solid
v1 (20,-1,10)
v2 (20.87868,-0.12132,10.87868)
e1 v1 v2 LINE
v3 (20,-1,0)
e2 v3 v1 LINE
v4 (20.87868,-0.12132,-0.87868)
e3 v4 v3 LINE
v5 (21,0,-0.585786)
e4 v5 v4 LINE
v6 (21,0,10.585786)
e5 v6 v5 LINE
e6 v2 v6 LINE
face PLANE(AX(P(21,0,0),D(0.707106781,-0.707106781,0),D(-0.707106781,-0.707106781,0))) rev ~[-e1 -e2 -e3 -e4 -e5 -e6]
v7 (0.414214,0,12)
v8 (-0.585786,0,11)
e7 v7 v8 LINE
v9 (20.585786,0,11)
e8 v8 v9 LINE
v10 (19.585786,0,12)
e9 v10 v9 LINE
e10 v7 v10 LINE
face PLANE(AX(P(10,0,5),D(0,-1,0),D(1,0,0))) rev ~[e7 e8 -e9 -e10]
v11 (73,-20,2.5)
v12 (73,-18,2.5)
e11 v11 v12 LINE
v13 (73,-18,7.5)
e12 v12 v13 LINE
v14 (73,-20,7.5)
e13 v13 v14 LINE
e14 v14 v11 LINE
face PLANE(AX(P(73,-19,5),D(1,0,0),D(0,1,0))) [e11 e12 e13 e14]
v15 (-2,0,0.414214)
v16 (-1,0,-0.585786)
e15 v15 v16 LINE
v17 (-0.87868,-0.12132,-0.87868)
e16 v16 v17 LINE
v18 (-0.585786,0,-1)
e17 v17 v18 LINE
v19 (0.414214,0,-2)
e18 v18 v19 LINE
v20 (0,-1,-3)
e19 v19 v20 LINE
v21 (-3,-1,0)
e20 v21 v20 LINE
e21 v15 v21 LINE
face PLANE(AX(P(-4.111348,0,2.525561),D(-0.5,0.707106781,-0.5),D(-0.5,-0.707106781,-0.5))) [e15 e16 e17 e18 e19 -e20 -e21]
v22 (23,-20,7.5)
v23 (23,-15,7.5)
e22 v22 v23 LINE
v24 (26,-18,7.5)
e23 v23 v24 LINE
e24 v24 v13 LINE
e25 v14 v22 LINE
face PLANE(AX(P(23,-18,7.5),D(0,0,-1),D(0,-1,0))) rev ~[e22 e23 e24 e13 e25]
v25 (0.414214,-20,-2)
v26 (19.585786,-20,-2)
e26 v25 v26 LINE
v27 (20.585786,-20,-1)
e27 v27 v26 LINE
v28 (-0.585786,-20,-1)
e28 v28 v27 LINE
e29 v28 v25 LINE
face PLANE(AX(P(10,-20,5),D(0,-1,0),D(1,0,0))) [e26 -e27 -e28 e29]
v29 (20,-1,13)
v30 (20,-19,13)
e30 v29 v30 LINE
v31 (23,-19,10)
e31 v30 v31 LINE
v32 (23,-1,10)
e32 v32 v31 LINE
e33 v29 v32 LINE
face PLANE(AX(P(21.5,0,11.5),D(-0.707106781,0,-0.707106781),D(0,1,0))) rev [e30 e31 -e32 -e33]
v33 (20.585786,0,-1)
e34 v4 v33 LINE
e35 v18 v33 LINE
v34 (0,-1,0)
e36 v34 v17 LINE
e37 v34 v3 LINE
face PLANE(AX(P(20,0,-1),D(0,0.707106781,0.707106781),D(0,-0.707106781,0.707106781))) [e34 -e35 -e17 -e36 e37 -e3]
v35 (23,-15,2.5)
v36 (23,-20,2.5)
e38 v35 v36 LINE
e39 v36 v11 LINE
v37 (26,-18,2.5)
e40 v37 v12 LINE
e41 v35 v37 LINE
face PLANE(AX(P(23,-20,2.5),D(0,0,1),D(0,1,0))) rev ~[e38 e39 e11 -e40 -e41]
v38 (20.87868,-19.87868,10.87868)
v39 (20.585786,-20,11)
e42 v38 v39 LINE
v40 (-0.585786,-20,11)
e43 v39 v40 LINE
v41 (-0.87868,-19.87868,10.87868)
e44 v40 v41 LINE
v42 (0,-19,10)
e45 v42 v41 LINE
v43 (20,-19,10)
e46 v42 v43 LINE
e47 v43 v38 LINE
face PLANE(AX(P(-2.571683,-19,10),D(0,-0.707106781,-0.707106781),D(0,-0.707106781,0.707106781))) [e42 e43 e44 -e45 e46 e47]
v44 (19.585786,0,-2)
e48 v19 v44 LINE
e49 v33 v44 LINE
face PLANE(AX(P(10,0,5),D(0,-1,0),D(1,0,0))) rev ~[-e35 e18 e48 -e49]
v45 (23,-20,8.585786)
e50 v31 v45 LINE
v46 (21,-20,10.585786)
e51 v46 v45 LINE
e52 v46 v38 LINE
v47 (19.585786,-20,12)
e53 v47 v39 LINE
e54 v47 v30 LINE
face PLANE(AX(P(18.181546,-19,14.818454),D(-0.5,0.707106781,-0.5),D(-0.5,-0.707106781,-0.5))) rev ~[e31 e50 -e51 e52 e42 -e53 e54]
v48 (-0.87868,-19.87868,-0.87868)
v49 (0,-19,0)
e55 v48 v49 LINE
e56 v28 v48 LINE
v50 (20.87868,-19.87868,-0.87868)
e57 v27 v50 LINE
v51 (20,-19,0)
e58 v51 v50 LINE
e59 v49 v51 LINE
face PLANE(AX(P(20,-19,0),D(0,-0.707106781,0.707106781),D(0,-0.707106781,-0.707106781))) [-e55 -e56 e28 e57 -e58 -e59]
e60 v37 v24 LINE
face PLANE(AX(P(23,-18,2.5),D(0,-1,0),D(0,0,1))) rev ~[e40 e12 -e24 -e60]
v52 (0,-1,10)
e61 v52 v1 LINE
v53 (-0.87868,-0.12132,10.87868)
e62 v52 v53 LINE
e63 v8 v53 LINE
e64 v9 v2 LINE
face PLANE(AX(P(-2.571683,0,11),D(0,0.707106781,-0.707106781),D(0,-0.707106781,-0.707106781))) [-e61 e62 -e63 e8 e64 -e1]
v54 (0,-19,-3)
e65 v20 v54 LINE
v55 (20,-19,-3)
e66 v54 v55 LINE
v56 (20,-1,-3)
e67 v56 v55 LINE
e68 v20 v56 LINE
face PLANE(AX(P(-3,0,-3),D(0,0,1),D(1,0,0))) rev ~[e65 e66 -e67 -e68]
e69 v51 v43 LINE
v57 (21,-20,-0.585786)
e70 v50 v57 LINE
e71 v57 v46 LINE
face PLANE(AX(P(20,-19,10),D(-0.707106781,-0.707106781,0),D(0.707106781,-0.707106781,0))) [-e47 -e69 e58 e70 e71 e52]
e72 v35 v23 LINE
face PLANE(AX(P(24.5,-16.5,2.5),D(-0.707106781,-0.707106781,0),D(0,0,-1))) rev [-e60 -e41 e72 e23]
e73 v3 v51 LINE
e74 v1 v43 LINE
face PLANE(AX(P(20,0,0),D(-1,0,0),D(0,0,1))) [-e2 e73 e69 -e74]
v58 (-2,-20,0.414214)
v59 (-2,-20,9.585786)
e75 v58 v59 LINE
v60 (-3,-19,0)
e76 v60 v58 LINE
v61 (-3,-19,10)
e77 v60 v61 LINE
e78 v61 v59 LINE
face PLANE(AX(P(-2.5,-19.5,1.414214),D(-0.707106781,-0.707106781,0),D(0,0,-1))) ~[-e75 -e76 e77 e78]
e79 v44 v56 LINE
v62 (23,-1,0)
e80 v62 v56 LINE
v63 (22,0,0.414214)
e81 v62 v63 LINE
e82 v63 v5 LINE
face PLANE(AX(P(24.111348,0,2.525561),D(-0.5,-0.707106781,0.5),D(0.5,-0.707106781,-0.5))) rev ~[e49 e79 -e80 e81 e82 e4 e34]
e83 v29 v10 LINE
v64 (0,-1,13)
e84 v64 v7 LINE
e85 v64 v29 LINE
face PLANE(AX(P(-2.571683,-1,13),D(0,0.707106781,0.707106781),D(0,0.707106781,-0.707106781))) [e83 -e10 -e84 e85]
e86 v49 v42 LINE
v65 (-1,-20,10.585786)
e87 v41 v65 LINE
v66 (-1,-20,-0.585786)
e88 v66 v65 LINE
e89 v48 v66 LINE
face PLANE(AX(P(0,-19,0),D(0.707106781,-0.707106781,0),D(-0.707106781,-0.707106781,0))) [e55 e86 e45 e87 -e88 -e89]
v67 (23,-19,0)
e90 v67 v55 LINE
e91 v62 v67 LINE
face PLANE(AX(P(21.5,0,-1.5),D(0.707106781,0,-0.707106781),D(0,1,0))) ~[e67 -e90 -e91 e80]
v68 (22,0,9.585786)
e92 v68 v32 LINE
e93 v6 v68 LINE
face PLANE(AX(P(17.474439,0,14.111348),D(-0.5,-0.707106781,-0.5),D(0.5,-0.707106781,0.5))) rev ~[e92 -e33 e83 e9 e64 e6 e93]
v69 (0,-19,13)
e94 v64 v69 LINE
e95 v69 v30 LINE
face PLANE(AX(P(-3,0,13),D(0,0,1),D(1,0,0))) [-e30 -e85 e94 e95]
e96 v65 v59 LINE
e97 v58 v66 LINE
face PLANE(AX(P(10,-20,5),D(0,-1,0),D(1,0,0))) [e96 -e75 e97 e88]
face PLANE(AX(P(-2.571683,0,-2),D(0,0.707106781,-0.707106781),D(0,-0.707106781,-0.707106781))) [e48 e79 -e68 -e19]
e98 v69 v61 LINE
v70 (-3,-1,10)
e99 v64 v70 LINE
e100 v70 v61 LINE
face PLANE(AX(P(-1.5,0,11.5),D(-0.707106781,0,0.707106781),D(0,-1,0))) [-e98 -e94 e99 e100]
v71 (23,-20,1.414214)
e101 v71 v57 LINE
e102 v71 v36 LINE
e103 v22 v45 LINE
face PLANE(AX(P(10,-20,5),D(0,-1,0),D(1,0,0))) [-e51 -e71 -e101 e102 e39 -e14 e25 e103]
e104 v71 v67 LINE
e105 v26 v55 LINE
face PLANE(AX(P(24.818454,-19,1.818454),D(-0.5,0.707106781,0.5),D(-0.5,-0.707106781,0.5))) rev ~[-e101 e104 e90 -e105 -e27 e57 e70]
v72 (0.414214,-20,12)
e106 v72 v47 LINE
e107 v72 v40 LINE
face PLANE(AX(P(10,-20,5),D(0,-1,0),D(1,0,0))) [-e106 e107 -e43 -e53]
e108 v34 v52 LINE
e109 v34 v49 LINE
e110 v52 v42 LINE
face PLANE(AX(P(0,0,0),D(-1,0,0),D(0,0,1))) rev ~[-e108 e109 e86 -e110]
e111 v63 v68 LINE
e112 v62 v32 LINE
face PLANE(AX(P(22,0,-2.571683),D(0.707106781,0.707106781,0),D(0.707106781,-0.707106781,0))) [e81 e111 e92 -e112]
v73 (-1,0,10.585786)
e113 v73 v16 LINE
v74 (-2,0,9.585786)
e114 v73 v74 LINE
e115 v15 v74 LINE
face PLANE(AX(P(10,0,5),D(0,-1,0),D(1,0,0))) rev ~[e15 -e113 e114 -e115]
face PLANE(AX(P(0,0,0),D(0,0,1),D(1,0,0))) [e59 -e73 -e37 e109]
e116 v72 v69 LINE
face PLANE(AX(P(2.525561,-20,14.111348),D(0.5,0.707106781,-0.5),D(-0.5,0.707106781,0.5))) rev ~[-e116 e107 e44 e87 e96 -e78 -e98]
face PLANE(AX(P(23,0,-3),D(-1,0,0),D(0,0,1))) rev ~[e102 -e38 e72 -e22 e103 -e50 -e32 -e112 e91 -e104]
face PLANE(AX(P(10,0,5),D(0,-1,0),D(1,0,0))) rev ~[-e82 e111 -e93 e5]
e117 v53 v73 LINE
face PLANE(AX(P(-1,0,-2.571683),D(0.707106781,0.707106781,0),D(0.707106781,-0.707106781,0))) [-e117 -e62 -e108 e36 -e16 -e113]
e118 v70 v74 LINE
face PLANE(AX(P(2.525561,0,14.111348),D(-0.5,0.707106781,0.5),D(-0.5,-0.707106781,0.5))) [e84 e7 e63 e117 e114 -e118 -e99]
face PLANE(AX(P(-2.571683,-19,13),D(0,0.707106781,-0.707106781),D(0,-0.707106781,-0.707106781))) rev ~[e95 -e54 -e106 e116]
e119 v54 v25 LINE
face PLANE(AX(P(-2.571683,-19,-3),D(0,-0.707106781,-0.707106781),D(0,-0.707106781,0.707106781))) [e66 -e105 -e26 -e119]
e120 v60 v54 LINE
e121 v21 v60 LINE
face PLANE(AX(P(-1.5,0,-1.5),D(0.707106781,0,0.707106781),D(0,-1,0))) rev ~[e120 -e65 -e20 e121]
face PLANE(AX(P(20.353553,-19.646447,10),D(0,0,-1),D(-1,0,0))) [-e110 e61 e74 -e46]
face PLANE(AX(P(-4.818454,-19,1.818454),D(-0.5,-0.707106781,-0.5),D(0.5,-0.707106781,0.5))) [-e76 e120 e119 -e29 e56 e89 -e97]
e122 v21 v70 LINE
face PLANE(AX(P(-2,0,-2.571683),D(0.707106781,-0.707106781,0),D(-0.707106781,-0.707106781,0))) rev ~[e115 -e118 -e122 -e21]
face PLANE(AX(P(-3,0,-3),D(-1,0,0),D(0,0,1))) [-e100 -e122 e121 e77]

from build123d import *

# Parameters (mm, degrees)
F0_W         = 26
F0_H         = 16
F0_W_2       = 20
F0_H_2       = 10
F1_DEPTH     = 20
F3_DEPTH     = 50
F4_SIZE      = 3
F5_T1_DEPTH  = 10
F5_T3_DEPTH  = 20
F5_T5_DEPTH  = 9.3860066631
F5_T7_DEPTH  = 9.3860066631
F5_T9_DEPTH  = 9.3860066631
F5_T11_DEPTH = 9.3860066631
F5_T13_DEPTH = 25.1433659759
F5_T15_DEPTH = 15.1433659759
F5_T21_DEPTH = 22.571682988
F5_T25_DEPTH = 12.571682988
F5_T32_DEPTH = 22.571682988
F5_T36_DEPTH = 12.571682988
F5_T43_DEPTH = 12.571682988
F5_T47_DEPTH = 22.571682988
F5_T54_DEPTH = 22.571682988
F5_T58_DEPTH = 12.571682988
F6_T1_DEPTH  = 9.3860066631
F6_T3_DEPTH  = 10
F6_T5_DEPTH  = 9.3860066631
F6_T7_DEPTH  = 25.1433659759
F6_T9_DEPTH  = 20
F6_T14_DEPTH = 9.3860066631
F6_T19_DEPTH = 9.3860066631
F6_T25_DEPTH = 22.571682988
F6_T30_DEPTH = 12.571682988
F6_T38_DEPTH = 22.571682988
F6_T43_DEPTH = 12.571682988
F6_T51_DEPTH = 22.571682988
F6_T56_DEPTH = 12.571682988
F6_T64_DEPTH = 12.571682988
F6_T69_DEPTH = 22.571682988
F7_SIZE      = 1


# Not quite as in the source:
# - a fillet or chamfer that OpenCascade refuses, or shapes differently, is made with other operations: its cross-section is extruded or revolved along the edge and cut away or added


with BuildPart() as f1:
    # F0 (on Front) → F1 (new body)
    with BuildSketch(Plane.XZ):
        with Locations((10, 5)):
            Rectangle(F0_W, F0_H)
        with Locations((10, 5)):
            Rectangle(F0_W_2, F0_H_2, mode=Mode.SUBTRACT)
    extrude(amount=F1_DEPTH)

    # F2 (on face) → F3 (join)
    with BuildSketch(Plane.YZ.offset(23)):
        Polygon((-18, 2.5), (-18, 5), (-18, 7.5), (-20, 7.5), (-20, 5), (-20, 2.5), align=None)
    extrude(amount=F3_DEPTH)

    # F4
    f4_edges = [f1.edges().sort_by_distance(p)[0] for p in [
        (-3, -10, 13),
        (23, -10, 13),
        (23, -18, 5),
        (-3, -10, -3),
        (23, -10, -3),
    ]]
    chamfer(f4_edges, length=F4_SIZE)

    # F5: chamfer of 1 on 12 edges, made by hand

    # F5_s2 → F5_t1 (cut)
    with BuildSketch(Plane.XY):
        Polygon((21, 0), (20, -1), (20, 0), align=None)
        Polygon((-1, 0), (0, -1), (0, 0), align=None)
    extrude(amount=F5_T1_DEPTH, mode=Mode.SUBTRACT)

    # F5_s4 → F5_t3 (cut)
    with BuildSketch(Plane.YZ):
        Polygon((0, 11), (-1, 10), (0, 10), align=None)
        Polygon((0, -1), (-1, 0), (0, 0), align=None)
    extrude(amount=F5_T3_DEPTH, mode=Mode.SUBTRACT)

    # F5_s6 → F5_t5 (cut)
    with BuildSketch(Plane(origin=(-3.3184544799, 0, 3.3184544799), x_dir=(0, 1, 0), z_dir=(0.7071067812, 0, -0.7071067812))):
        Polygon((0, -1.1213203436), (-1, -2.1213203436), (0, -2.1213203436), align=None)
    extrude(amount=F5_T5_DEPTH, mode=Mode.SUBTRACT)

    # F5_s8 → F5_t7 (cut)
    with BuildSketch(Plane(origin=(13.3184544799, 0, 13.3184544799), x_dir=(0, 1, 0), z_dir=(-0.7071067812, 0, -0.7071067812))):
        Polygon((0, 15.2634559673), (-1, 16.2634559673), (0, 16.2634559673), align=None)
    extrude(amount=F5_T7_DEPTH, mode=Mode.SUBTRACT)

    # F5_s10 → F5_t9 (cut)
    with BuildSketch(Plane(origin=(1.6815455201, 0, -1.6815455201), x_dir=(0, 1, 0), z_dir=(0.7071067812, 0, -0.7071067812))):
        Polygon((0, 22.3345237792), (-1, 23.3345237792), (0, 23.3345237792), align=None)
    extrude(amount=F5_T9_DEPTH, mode=Mode.SUBTRACT)

    # F5_s12 → F5_t11 (cut)
    with BuildSketch(Plane(origin=(8.3184544799, 0, 8.3184544799), x_dir=(0, 1, 0), z_dir=(-0.7071067812, 0, -0.7071067812))):
        Polygon((0, -8.1923881554), (-1, -9.1923881554), (0, -9.1923881554), align=None)
    extrude(amount=F5_T11_DEPTH, mode=Mode.SUBTRACT)

    # F5_s14 → F5_t13 (cut)
    with BuildSketch(Plane.YZ.offset(-2.571682988)):
        Polygon((0, -2), (-1, -3), (0, -3), align=None)
        Polygon((-1, 13), (0, 12), (0, 13), align=None)
    extrude(amount=F5_T13_DEPTH, mode=Mode.SUBTRACT)

    # F5_s16 → F5_t15 (cut)
    with BuildSketch(Plane.XY.offset(-2.571682988)):
        Polygon((22, 0), (23, -1), (23, 0), align=None)
        Polygon((-2, 0), (-3, -1), (-3, 0), align=None)
    extrude(amount=F5_T15_DEPTH, mode=Mode.SUBTRACT)


with BuildPart() as f5_tool19:
    # F5_s20 → F5_t21 (new body)
    with BuildSketch(Plane.YZ):
        Polygon((0, 11), (-1, 10), (0, 10), align=None)
    extrude(amount=F5_T21_DEPTH)

    split(bisect_by=Plane.YZ.offset(20), keep=Keep.TOP)


with BuildPart() as f5_tool23:
    # F5_s24 → F5_t25 (new body)
    with BuildSketch(Plane.XY.offset(12.571682988)):
        Polygon((21, 0), (20, -1), (20, 0), align=None)
    extrude(amount=-F5_T25_DEPTH)

    split(bisect_by=Plane.XY.offset(10), keep=Keep.TOP)


with BuildPart() as f5_tool19_1:
    add(f5_tool19.part)

    # F5_t27: intersect F5_tool23
    add(f5_tool23.part, mode=Mode.INTERSECT)


with BuildPart() as f1_1:
    add(f1.part)

    # F5_t17: cut F5_tool19
    add(f5_tool19_1.part, mode=Mode.SUBTRACT)


with BuildPart() as f5_tool30:
    # F5_s31 → F5_t32 (new body)
    with BuildSketch(Plane.YZ.offset(22.571682988)):
        Polygon((0, -1), (-1, 0), (0, 0), align=None)
    extrude(amount=-F5_T32_DEPTH)

    split(bisect_by=Plane.YZ.offset(20), keep=Keep.TOP)


with BuildPart() as f5_tool34:
    # F5_s35 → F5_t36 (new body)
    with BuildSketch(Plane.XY.offset(10)):
        Polygon((21, 0), (20, -1), (20, 0), align=None)
    extrude(amount=-F5_T36_DEPTH)

    split(bisect_by=Plane.XY, keep=Keep.BOTTOM)


with BuildPart() as f5_tool30_1:
    add(f5_tool30.part)

    # F5_t38: intersect F5_tool34
    add(f5_tool34.part, mode=Mode.INTERSECT)


with BuildPart() as f1_2:
    add(f1_1.part)

    # F5_t28: cut F5_tool30
    add(f5_tool30_1.part, mode=Mode.SUBTRACT)


with BuildPart() as f5_tool41:
    # F5_s42 → F5_t43 (new body)
    with BuildSketch(Plane.XY):
        Polygon((-1, 0), (0, -1), (0, 0), align=None)
    extrude(amount=F5_T43_DEPTH)

    split(bisect_by=Plane.XY.offset(10), keep=Keep.TOP)


with BuildPart() as f5_tool45:
    # F5_s46 → F5_t47 (new body)
    with BuildSketch(Plane.YZ.offset(-2.571682988)):
        Polygon((0, 11), (-1, 10), (0, 10), align=None)
    extrude(amount=F5_T47_DEPTH)

    split(bisect_by=Plane.YZ, keep=Keep.BOTTOM)


with BuildPart() as f5_tool41_1:
    add(f5_tool41.part)

    # F5_t49: intersect F5_tool45
    add(f5_tool45.part, mode=Mode.INTERSECT)


with BuildPart() as f1_3:
    add(f1_2.part)

    # F5_t39: cut F5_tool41
    add(f5_tool41_1.part, mode=Mode.SUBTRACT)


with BuildPart() as f5_tool52:
    # F5_s53 → F5_t54 (new body)
    with BuildSketch(Plane.YZ.offset(20)):
        Polygon((0, -1), (-1, 0), (0, 0), align=None)
    extrude(amount=-F5_T54_DEPTH)

    split(bisect_by=Plane.YZ, keep=Keep.BOTTOM)


with BuildPart() as f5_tool56:
    # F5_s57 → F5_t58 (new body)
    with BuildSketch(Plane.XY.offset(-2.571682988)):
        Polygon((-1, 0), (0, -1), (0, 0), align=None)
    extrude(amount=F5_T58_DEPTH)

    split(bisect_by=Plane.XY, keep=Keep.BOTTOM)


with BuildPart() as f5_tool52_1:
    add(f5_tool52.part)

    # F5_t60: intersect F5_tool56
    add(f5_tool56.part, mode=Mode.INTERSECT)


with BuildPart() as f1_4:
    add(f1_3.part)

    # F5_t50: cut F5_tool52
    add(f5_tool52_1.part, mode=Mode.SUBTRACT)

    # F6: chamfer of 1 on 10 edges, made by hand

    # F6_s2 → F6_t1 (cut)
    with BuildSketch(Plane(origin=(-3.3184544799, 0, 3.3184544799), x_dir=(0, 1, 0), z_dir=(0.7071067812, 0, -0.7071067812))):
        Polygon((-19, -2.1213203436), (-20, -1.1213203436), (-20, -2.1213203436), align=None)
    extrude(amount=F6_T1_DEPTH, mode=Mode.SUBTRACT)

    # F6_s4 → F6_t3 (cut)
    with BuildSketch(Plane.XY):
        Polygon((0, -19), (-1, -20), (0, -20), align=None)
        Polygon((20, -19), (21, -20), (20, -20), align=None)
    extrude(amount=F6_T3_DEPTH, mode=Mode.SUBTRACT)

    # F6_s6 → F6_t5 (cut)
    with BuildSketch(Plane(origin=(8.3184544799, 0, 8.3184544799), x_dir=(0, 1, 0), z_dir=(-0.7071067812, 0, -0.7071067812))):
        Polygon((-20, -8.1923881554), (-19, -9.1923881554), (-20, -9.1923881554), align=None)
    extrude(amount=F6_T5_DEPTH, mode=Mode.SUBTRACT)

    # F6_s8 → F6_t7 (cut)
    with BuildSketch(Plane.YZ.offset(-2.571682988)):
        Polygon((-19, -3), (-20, -2), (-20, -3), align=None)
        Polygon((-19, 13), (-20, 12), (-20, 13), align=None)
    extrude(amount=F6_T7_DEPTH, mode=Mode.SUBTRACT)

    # F6_s10 → F6_t9 (cut)
    with BuildSketch(Plane.YZ):
        Polygon((-19, 0), (-20, -1), (-20, 0), align=None)
        Polygon((-19, 10), (-20, 11), (-20, 10), align=None)
    extrude(amount=F6_T9_DEPTH, mode=Mode.SUBTRACT)


with BuildPart() as f6_tool12:
    # F6_s13 → F6_t14 (new body)
    with BuildSketch(Plane(origin=(1.6815455201, 0, -1.6815455201), x_dir=(0, 1, 0), z_dir=(0.7071067812, 0, -0.7071067812))):
        Polygon((-19, 23.3345237792), (-20, 22.3345237792), (-20, 23.3345237792), align=None)
    extrude(amount=F6_T14_DEPTH)

    split(bisect_by=Plane.XY.offset(7.5), keep=Keep.TOP)


with BuildPart() as f1_5:
    add(f1_4.part)

    # F6_t11: cut F6_tool12
    add(f6_tool12.part, mode=Mode.SUBTRACT)


with BuildPart() as f6_tool17:
    # F6_s18 → F6_t19 (new body)
    with BuildSketch(Plane(origin=(13.3184544799, 0, 13.3184544799), x_dir=(0, 1, 0), z_dir=(-0.7071067812, 0, -0.7071067812))):
        Polygon((-19, 16.2634559673), (-20, 15.2634559673), (-20, 16.2634559673), align=None)
    extrude(amount=F6_T19_DEPTH)

    split(bisect_by=Plane.XY.offset(2.5), keep=Keep.BOTTOM)


with BuildPart() as f1_6:
    add(f1_5.part)

    # F6_t16: cut F6_tool17
    add(f6_tool17.part, mode=Mode.SUBTRACT)


with BuildPart() as f6_tool23:
    # F6_s24 → F6_t25 (new body)
    with BuildSketch(Plane.YZ.offset(20)):
        Polygon((-19, 0), (-20, -1), (-20, 0), align=None)
    extrude(amount=-F6_T25_DEPTH)

    split(bisect_by=Plane(origin=(-1.5, 0, -1.5), x_dir=(0, 1, 0), z_dir=(0.7071067812, 0, 0.7071067812)), keep=Keep.TOP)

    split(bisect_by=Plane.YZ, keep=Keep.BOTTOM)


with BuildPart() as f6_tool28:
    # F6_s29 → F6_t30 (new body)
    with BuildSketch(Plane.XY.offset(-2.571682988)):
        Polygon((0, -19), (-1, -20), (0, -20), align=None)
    extrude(amount=F6_T30_DEPTH)

    split(bisect_by=Plane(origin=(-1.5, 0, -1.5), x_dir=(0, 1, 0), z_dir=(0.7071067812, 0, 0.7071067812)), keep=Keep.TOP)

    split(bisect_by=Plane.XY, keep=Keep.BOTTOM)


with BuildPart() as f6_tool23_1:
    add(f6_tool23.part)

    # F6_t33: intersect F6_tool28
    add(f6_tool28.part, mode=Mode.INTERSECT)


with BuildPart() as f1_7:
    add(f1_6.part)

    # F6_t21: cut F6_tool23
    add(f6_tool23_1.part, mode=Mode.SUBTRACT)


with BuildPart() as f6_tool36:
    # F6_s37 → F6_t38 (new body)
    with BuildSketch(Plane.YZ.offset(-2.571682988)):
        Polygon((-19, 10), (-20, 11), (-20, 10), align=None)
    extrude(amount=F6_T38_DEPTH)

    split(bisect_by=Plane.YZ, keep=Keep.BOTTOM)

    split(bisect_by=Plane(origin=(-6.5, 0, 6.5), x_dir=(0, 1, 0), z_dir=(0.7071067812, 0, -0.7071067812)), keep=Keep.TOP)


with BuildPart() as f6_tool41:
    # F6_s42 → F6_t43 (new body)
    with BuildSketch(Plane.XY):
        Polygon((0, -19), (-1, -20), (0, -20), align=None)
    extrude(amount=F6_T43_DEPTH)

    split(bisect_by=Plane.XY.offset(10), keep=Keep.TOP)

    split(bisect_by=Plane(origin=(-6.5, 0, 6.5), x_dir=(0, 1, 0), z_dir=(0.7071067812, 0, -0.7071067812)), keep=Keep.TOP)


with BuildPart() as f6_tool36_1:
    add(f6_tool36.part)

    # F6_t46: intersect F6_tool41
    add(f6_tool41.part, mode=Mode.INTERSECT)


with BuildPart() as f1_8:
    add(f1_7.part)

    # F6_t34: cut F6_tool36
    add(f6_tool36_1.part, mode=Mode.SUBTRACT)


with BuildPart() as f6_tool49:
    # F6_s50 → F6_t51 (new body)
    with BuildSketch(Plane.YZ.offset(22.571682988)):
        Polygon((-19, 0), (-20, -1), (-20, 0), align=None)
    extrude(amount=-F6_T51_DEPTH)

    split(bisect_by=Plane(origin=(11.5, 0, -11.5), x_dir=(0, 1, 0), z_dir=(-0.7071067812, 0, 0.7071067812)), keep=Keep.TOP)

    split(bisect_by=Plane.YZ.offset(20), keep=Keep.TOP)


with BuildPart() as f6_tool54:
    # F6_s55 → F6_t56 (new body)
    with BuildSketch(Plane.XY.offset(10)):
        Polygon((20, -19), (21, -20), (20, -20), align=None)
    extrude(amount=-F6_T56_DEPTH)

    split(bisect_by=Plane(origin=(11.5, 0, -11.5), x_dir=(0, 1, 0), z_dir=(-0.7071067812, 0, 0.7071067812)), keep=Keep.TOP)

    split(bisect_by=Plane.XY, keep=Keep.BOTTOM)


with BuildPart() as f6_tool49_1:
    add(f6_tool49.part)

    # F6_t59: intersect F6_tool54
    add(f6_tool54.part, mode=Mode.INTERSECT)


with BuildPart() as f1_9:
    add(f1_8.part)

    # F6_t47: cut F6_tool49
    add(f6_tool49_1.part, mode=Mode.SUBTRACT)


with BuildPart() as f6_tool62:
    # F6_s63 → F6_t64 (new body)
    with BuildSketch(Plane.XY.offset(12.571682988)):
        Polygon((20, -19), (21, -20), (20, -20), align=None)
    extrude(amount=-F6_T64_DEPTH)

    split(bisect_by=Plane(origin=(16.5, 0, 16.5), x_dir=(0, 1, 0), z_dir=(-0.7071067812, 0, -0.7071067812)), keep=Keep.TOP)

    split(bisect_by=Plane.XY.offset(10), keep=Keep.TOP)


with BuildPart() as f6_tool67:
    # F6_s68 → F6_t69 (new body)
    with BuildSketch(Plane.YZ):
        Polygon((-19, 10), (-20, 11), (-20, 10), align=None)
    extrude(amount=F6_T69_DEPTH)

    split(bisect_by=Plane(origin=(16.5, 0, 16.5), x_dir=(0, 1, 0), z_dir=(-0.7071067812, 0, -0.7071067812)), keep=Keep.TOP)

    split(bisect_by=Plane.YZ.offset(20), keep=Keep.TOP)


with BuildPart() as f6_tool62_1:
    add(f6_tool62.part)

    # F6_t72: intersect F6_tool67
    add(f6_tool67.part, mode=Mode.INTERSECT)


with BuildPart() as f1_10:
    add(f1_9.part)

    # F6_t60: cut F6_tool62
    add(f6_tool62_1.part, mode=Mode.SUBTRACT)

    # F7
    f7_edges = [f1_10.edges().sort_by_distance(p)[0] for p in [
        (-3, -20, 5),
    ]]
    chamfer(f7_edges, length=F7_SIZE)


solid = f1_10.part
